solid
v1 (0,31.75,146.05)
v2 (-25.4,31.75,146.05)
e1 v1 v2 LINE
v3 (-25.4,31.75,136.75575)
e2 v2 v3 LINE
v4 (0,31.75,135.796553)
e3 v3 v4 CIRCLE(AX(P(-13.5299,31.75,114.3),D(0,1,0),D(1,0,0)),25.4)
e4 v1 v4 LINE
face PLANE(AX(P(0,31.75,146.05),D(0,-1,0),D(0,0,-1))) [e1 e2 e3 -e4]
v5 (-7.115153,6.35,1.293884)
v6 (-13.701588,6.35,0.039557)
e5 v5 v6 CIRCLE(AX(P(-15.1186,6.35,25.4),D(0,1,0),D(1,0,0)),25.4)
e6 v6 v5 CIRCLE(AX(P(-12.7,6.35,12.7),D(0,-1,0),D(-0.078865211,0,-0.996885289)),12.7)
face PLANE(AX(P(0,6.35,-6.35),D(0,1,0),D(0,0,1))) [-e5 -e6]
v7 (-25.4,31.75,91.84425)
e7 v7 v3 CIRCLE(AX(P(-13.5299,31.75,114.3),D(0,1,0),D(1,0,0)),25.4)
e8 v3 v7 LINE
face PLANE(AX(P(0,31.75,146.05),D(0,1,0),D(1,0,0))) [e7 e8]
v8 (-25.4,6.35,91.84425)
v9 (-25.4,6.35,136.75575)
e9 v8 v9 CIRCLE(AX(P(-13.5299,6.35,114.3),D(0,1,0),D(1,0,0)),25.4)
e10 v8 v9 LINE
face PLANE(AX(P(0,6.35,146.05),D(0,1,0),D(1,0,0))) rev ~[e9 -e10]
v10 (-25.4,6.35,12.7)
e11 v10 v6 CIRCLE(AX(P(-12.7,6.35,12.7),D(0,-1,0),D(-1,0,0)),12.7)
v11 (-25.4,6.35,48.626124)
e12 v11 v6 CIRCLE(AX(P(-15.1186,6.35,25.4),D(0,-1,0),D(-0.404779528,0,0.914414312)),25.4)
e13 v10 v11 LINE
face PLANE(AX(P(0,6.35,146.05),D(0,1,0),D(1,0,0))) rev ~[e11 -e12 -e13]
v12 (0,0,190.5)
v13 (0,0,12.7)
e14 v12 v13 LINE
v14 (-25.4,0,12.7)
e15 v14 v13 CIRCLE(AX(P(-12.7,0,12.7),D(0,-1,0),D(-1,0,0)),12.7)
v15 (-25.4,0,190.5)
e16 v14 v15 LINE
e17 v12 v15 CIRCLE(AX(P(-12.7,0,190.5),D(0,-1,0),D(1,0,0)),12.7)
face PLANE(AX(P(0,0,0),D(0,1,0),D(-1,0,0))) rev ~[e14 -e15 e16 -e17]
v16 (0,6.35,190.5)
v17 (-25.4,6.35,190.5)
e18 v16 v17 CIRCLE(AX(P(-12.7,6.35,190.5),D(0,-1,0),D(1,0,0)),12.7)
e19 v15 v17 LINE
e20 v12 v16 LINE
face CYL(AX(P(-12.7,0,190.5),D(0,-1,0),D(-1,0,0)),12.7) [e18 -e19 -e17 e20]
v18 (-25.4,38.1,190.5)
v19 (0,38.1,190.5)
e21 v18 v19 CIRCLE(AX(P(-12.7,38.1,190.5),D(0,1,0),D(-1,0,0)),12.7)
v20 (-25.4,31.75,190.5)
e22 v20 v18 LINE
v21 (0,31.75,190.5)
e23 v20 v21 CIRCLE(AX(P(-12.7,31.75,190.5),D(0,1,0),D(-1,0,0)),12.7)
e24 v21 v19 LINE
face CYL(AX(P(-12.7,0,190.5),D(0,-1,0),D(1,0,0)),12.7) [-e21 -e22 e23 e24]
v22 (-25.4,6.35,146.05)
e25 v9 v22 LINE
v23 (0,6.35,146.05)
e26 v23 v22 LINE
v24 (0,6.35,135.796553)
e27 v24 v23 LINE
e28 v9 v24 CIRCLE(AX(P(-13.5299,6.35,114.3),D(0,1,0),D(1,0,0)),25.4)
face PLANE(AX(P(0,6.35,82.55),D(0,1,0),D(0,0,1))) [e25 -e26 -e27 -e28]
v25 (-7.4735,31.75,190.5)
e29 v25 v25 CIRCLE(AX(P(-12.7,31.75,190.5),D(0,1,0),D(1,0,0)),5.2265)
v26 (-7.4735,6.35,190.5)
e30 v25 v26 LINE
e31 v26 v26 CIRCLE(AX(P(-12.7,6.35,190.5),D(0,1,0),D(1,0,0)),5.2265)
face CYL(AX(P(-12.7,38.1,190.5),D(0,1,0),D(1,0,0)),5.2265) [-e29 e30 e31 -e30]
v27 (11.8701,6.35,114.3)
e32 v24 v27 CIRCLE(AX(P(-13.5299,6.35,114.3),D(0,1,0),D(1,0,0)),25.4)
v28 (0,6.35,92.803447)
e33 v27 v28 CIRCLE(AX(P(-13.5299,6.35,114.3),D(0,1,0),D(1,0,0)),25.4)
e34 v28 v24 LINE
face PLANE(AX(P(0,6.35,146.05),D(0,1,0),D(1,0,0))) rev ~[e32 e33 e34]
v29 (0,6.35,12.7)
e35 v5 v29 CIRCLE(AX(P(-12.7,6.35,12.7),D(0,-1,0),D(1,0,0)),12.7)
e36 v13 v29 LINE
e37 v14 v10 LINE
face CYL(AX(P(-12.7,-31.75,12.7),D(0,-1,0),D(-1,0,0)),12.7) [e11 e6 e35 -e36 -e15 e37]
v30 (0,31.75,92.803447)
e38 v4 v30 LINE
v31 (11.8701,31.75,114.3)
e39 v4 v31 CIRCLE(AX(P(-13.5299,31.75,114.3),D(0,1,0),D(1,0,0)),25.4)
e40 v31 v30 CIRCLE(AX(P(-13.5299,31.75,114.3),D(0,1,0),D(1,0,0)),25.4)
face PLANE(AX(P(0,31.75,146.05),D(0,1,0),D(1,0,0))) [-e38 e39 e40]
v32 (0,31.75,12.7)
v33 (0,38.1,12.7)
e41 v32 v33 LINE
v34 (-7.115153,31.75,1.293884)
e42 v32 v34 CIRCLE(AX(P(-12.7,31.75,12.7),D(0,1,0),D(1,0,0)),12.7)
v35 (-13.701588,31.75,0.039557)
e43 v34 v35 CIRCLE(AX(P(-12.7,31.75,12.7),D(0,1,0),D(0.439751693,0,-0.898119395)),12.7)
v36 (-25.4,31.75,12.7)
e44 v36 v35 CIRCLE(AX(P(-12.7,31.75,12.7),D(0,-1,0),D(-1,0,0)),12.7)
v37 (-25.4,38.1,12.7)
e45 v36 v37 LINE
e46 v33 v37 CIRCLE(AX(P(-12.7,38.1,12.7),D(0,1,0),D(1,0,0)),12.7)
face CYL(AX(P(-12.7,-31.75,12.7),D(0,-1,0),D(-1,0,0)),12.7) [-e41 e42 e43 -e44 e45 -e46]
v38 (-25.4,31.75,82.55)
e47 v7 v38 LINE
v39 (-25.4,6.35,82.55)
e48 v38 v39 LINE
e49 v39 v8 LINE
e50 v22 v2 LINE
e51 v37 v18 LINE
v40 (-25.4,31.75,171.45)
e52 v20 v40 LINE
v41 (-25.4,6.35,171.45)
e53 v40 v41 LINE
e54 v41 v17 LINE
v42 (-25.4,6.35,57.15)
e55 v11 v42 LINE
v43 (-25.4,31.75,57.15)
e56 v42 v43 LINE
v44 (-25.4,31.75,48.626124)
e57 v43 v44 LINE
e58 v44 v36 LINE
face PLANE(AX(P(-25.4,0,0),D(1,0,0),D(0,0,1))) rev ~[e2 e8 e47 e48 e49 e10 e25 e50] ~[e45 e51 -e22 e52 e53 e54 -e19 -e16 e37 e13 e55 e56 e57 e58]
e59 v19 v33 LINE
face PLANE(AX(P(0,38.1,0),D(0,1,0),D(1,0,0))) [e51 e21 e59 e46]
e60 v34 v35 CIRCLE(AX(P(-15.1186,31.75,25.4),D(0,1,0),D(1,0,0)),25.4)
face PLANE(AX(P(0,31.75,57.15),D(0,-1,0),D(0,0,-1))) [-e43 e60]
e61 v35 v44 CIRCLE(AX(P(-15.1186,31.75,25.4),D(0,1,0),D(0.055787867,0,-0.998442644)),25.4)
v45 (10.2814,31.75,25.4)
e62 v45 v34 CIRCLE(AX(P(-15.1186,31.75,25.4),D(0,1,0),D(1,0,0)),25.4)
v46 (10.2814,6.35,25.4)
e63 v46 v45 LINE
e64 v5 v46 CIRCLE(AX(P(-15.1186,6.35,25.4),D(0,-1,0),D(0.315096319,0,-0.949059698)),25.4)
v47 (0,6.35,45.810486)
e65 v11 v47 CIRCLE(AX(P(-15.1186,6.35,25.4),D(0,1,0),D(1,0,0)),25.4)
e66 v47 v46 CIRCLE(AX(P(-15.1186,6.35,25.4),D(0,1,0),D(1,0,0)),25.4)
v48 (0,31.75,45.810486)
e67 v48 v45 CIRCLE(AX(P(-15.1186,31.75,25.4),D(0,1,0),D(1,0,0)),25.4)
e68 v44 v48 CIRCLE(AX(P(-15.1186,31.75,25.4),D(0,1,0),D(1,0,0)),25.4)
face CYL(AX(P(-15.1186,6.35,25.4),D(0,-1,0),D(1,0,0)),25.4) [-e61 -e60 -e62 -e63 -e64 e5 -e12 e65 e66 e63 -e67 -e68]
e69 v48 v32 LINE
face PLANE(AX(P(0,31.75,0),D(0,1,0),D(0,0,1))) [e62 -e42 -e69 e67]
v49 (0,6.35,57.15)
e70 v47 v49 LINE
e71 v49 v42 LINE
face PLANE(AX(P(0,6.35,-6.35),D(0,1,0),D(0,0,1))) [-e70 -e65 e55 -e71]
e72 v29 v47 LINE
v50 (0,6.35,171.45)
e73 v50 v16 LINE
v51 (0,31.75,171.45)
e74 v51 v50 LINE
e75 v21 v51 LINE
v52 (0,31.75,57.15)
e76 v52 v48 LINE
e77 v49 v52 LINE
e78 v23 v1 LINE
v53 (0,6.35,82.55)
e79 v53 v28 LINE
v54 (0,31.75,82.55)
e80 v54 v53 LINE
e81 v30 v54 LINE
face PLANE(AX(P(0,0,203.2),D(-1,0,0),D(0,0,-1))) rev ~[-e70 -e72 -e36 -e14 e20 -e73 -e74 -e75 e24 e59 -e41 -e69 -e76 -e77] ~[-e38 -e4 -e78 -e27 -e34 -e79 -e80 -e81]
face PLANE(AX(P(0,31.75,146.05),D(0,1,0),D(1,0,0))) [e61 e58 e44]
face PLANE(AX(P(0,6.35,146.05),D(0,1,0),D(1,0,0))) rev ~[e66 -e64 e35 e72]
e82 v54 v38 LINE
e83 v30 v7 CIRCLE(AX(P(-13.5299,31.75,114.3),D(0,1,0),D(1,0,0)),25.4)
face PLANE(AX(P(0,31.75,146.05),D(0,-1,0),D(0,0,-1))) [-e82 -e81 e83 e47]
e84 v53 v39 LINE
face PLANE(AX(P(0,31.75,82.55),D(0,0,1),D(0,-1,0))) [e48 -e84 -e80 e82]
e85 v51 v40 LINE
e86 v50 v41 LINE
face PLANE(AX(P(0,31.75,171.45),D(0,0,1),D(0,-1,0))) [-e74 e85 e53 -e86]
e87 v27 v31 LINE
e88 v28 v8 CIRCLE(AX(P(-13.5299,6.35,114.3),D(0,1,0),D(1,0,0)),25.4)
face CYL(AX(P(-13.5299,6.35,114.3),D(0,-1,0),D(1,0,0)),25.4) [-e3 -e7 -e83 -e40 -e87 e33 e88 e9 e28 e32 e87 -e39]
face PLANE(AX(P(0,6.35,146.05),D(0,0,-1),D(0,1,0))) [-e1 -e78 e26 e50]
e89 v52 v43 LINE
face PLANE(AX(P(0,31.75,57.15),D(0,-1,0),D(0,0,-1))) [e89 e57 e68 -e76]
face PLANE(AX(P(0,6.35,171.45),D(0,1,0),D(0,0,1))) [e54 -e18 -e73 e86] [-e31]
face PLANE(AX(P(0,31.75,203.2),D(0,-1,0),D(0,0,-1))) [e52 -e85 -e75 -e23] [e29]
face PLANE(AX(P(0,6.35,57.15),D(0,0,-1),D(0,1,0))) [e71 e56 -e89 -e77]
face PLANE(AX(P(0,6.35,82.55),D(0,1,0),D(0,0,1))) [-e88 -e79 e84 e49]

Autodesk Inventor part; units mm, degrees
ref_plane "YZ Plane" through (0, 0, 0) normal (1, 0, 0) x (0, 1, 0)
ref_plane "XZ Plane" through (0, 0, 0) normal (0, 1, 0) x (-1, 0, 0)
ref_plane "XY Plane" through (0, 0, 0) normal (0, 0, 1) x (1, 0, 0)
sketch "Sketch1" plane through (0, 0, 0) normal (0, 1, 0) x (-1, 0, 0)
  line L0 (0, 0) -> (25.4, 0)
  line L1 (25.4, 0) -> (25.4, 203.2)
  line L2 (25.4, 203.2) -> (0, 203.2)
  line L3 (0, 203.2) -> (0, 0)
  dimension "d0" = 203.2
  dimension "d1" = 25.4
extrude "Extrusion1" add sketch "Sketch1" along normal blind 38.1
sketch "Sketch2" plane through (0, 38.1, 0) normal (0, 1, 0) x (1, 0, 0)
  circle A0 centre (-12.7, -190.5) radius 5.2265
  line L0 (-25.4, 0) -> (-25.4, -203.2) projected
  line L1 (-25.4, -203.2) -> (0, -203.2) projected
  point P0 (0, 0)
  point P1 (-25.4, -12.7)
  point P2 (-25.4, -190.5)
  dimension "d5" = 10.453
  dimension "d6" = 12.7
  dimension "d7" = 12.7
sketch "Sketch3" plane through (0, 0, 203.2) normal (1, 0, 0) x (0, 0, -1)
  line L0 (0, 0) -> (0, 38.1) projected
  line L1 (0, 31.75) -> (31.75, 31.75)
  line L2 (31.75, 31.75) -> (31.75, 6.35)
  line L3 (31.75, 6.35) -> (0, 6.35)
  line L4 (0, 6.35) -> (0, 31.75)
  line L5 (0, 38.1) -> (203.2, 38.1) projected
  line L6 (57.15, 31.75) -> (120.65, 31.75)
  line L7 (120.65, 31.75) -> (120.65, 6.35)
  line L8 (120.65, 6.35) -> (57.15, 6.35)
  line L9 (57.15, 6.35) -> (57.15, 31.75)
  line L10 (146.05, 31.75) -> (209.55, 31.75)
  line L11 (209.55, 31.75) -> (209.55, 6.35)
  line L12 (209.55, 6.35) -> (146.05, 6.35)
  line L13 (146.05, 6.35) -> (146.05, 31.75)
  point P0 (203.2, 0)
  dimension "d8" = 25.4
  dimension "d9" = 6.35
  dimension "d10" = 203.2
  dimension "d11" = 31.75
  dimension "d16" = 63.5
  dimension "d17" = 63.5
  dimension "d18" = 25.4
  dimension "d19" = 25.4
extrude "Extrusion4" cut sketch "Sketch3" against normal blind 68.2625
extrude "Extrusion3" add sketch "Sketch2" against normal blind 38.1
sketch "Sketch4" plane through (0, 6.35, 146.05) normal (0, 1, 0) x (1, 0, 0)
  circle A0 centre (-13.5299, 31.75) radius 25.4
  circle A1 centre (-15.1186, 120.65) radius 25.4
  line L0 (0, 63.5) -> (-25.4, 63.5) projected
  line L1 (0, 88.9) -> (-25.4, 88.9) projected
  point P0 (0, 146.05)
  dimension "d22" = 31.75
  dimension "d23" = 31.75
  dimension "d24" = 50.8
extrude "Extrusion5" add sketch "Sketch4" along normal blind 25.4
fillet "Fillet2" radius 12.7 8 edges at (0, 34.925, 0) (0, 3.175, 0) (-25.4, 3.175, 0) (-25.4, 34.925, 0) (0, 34.925, 203.2) (-25.4, 34.925, 203.2) (0, 3.175, 203.2) (-25.4, 3.175, 203.2)
properties part number "arm2"
